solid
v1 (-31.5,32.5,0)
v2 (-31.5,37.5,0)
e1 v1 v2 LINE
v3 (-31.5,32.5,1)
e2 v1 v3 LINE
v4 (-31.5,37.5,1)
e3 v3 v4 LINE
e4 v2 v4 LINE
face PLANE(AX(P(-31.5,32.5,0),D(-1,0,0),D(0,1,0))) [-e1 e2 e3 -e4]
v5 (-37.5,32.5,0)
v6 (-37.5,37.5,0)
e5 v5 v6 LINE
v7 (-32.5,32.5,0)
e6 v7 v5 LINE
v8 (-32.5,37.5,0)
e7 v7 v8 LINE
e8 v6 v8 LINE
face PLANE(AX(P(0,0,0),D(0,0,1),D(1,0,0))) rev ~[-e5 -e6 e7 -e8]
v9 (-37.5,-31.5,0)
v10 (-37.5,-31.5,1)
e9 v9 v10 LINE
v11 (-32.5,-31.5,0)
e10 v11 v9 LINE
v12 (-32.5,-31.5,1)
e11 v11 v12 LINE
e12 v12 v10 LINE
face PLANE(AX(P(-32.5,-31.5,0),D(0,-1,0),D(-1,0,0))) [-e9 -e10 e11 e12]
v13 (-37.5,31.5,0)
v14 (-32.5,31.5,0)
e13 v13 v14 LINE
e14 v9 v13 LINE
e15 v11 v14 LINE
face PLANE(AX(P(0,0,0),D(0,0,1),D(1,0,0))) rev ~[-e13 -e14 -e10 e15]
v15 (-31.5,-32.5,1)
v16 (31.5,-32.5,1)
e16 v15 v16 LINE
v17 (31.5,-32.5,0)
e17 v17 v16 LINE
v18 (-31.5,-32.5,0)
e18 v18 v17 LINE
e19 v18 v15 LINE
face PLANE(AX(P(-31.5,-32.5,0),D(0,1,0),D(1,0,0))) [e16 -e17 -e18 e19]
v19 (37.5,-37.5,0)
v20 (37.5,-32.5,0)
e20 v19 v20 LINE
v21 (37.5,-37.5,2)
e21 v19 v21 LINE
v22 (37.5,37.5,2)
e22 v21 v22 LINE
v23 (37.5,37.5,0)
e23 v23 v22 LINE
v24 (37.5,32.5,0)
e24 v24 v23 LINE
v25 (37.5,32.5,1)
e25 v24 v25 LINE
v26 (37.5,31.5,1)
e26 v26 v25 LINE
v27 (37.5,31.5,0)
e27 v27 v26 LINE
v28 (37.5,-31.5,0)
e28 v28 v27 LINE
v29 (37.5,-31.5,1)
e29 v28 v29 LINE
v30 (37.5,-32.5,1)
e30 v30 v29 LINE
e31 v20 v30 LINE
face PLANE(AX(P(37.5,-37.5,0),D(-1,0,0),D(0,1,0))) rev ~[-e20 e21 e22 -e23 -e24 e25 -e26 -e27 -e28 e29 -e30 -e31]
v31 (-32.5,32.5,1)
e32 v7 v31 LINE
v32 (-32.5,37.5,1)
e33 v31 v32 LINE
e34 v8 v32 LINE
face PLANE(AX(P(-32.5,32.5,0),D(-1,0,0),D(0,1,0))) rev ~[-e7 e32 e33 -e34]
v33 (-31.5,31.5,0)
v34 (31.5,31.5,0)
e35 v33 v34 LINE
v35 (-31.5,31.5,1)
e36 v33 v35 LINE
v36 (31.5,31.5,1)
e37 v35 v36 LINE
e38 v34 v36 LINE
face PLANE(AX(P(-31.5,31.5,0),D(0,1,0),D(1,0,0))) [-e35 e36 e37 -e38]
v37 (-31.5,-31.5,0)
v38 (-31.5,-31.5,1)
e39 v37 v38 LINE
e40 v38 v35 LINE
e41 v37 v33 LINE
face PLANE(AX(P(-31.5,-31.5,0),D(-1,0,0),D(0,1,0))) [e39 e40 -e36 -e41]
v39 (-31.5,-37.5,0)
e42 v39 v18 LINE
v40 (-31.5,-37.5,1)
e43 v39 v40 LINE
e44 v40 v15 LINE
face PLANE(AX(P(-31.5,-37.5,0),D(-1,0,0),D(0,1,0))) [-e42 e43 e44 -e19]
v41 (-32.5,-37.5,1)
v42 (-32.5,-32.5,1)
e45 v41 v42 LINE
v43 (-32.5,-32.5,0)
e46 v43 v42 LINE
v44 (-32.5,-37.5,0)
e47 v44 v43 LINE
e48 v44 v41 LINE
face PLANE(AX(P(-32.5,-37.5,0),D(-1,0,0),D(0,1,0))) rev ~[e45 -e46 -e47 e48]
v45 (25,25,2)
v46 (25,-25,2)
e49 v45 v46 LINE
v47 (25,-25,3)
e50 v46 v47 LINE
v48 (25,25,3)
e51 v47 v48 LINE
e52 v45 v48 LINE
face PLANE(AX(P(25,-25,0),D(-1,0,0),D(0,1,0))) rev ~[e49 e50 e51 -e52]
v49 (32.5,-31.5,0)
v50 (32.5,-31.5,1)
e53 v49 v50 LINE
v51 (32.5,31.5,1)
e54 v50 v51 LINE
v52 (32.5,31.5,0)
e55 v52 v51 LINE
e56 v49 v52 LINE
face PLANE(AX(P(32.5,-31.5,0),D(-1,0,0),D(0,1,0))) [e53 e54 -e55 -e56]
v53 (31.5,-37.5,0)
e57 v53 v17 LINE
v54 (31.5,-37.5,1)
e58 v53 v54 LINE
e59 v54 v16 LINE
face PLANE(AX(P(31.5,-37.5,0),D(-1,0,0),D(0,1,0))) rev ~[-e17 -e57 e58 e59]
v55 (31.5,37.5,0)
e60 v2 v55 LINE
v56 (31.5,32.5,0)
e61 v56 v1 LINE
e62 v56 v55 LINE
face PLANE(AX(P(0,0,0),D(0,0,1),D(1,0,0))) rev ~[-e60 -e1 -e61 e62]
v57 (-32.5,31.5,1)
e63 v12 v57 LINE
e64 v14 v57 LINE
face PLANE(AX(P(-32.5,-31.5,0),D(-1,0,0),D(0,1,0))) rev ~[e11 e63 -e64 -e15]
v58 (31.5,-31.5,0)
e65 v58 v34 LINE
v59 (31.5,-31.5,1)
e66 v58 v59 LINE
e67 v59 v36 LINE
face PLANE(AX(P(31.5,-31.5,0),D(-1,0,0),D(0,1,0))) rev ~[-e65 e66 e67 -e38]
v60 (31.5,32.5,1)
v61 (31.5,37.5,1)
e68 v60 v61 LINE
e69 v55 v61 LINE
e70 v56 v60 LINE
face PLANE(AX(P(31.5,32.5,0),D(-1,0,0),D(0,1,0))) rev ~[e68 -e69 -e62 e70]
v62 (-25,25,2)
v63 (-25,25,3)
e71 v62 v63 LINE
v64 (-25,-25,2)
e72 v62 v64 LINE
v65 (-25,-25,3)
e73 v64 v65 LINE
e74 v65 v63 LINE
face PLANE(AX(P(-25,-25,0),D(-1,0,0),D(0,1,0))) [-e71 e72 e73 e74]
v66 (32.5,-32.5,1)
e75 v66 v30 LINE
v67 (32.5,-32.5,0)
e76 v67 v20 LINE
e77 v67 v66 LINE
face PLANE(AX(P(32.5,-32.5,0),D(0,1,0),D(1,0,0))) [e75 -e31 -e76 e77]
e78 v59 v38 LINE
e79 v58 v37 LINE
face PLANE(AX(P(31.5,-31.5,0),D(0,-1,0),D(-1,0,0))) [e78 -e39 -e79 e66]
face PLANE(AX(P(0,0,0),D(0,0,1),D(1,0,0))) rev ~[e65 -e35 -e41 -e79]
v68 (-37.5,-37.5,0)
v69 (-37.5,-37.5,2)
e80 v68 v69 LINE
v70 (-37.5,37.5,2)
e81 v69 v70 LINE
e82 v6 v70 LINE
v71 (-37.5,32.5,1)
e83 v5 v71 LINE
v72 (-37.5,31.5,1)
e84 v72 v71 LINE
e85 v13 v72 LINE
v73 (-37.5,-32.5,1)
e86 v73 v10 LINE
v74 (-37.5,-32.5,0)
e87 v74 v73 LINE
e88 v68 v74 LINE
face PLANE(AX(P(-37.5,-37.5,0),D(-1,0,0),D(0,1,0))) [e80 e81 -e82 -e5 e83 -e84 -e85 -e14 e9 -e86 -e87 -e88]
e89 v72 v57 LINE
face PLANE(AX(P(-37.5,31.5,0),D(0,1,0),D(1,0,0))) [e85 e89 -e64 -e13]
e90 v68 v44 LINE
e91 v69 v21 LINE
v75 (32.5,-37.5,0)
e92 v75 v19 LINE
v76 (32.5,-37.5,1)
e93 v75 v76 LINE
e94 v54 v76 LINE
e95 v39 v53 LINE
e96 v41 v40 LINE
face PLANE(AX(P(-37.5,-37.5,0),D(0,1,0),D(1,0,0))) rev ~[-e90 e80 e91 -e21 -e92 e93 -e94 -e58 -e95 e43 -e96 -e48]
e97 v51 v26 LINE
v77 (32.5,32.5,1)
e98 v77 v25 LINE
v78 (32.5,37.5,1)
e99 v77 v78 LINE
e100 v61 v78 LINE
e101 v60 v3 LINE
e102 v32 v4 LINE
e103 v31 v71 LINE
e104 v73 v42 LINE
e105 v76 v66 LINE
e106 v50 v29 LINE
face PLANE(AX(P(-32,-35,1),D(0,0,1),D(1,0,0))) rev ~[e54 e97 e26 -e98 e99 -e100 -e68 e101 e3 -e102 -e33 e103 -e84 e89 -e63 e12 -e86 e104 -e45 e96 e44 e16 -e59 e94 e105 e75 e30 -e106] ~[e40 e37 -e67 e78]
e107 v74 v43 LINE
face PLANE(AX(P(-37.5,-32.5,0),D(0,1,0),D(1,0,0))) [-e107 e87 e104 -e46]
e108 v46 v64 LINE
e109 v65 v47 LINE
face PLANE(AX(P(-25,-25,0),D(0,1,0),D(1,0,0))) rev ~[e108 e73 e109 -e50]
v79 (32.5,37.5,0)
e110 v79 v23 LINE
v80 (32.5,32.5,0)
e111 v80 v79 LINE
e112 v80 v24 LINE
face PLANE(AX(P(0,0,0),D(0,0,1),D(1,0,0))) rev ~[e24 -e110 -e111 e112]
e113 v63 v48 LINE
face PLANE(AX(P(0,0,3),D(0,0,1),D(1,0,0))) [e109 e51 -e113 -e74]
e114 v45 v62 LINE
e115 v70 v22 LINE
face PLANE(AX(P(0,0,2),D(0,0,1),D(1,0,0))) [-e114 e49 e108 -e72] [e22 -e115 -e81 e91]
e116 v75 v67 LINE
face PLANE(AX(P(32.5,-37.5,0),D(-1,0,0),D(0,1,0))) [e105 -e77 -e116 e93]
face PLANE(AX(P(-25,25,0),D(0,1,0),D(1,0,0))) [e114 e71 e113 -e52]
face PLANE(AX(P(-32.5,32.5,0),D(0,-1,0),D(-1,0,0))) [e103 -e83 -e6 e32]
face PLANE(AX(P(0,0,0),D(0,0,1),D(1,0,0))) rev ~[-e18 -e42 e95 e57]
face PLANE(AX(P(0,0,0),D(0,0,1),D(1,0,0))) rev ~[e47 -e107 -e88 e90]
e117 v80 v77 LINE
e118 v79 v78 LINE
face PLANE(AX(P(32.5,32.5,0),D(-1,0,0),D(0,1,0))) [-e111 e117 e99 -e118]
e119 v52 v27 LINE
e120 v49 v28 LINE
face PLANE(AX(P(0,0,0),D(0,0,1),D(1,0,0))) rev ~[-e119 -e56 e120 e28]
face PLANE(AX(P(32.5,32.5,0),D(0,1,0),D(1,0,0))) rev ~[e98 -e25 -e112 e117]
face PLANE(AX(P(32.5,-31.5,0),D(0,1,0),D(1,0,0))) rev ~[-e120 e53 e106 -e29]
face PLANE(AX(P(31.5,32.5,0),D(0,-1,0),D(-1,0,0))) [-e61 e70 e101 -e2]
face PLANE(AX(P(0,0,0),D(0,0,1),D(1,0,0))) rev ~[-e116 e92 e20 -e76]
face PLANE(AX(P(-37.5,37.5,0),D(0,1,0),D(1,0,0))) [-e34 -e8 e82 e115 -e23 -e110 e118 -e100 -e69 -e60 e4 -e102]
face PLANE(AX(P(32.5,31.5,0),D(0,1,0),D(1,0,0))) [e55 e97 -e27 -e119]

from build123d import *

# Parameters (mm, degrees)
F0_W     = 75
F0_H     = 75
F0_W_2   = 50
F0_H_2   = 50
F1_DEPTH = 2
F2_DEPTH = 3
F3_W     = 1
F3_H     = 5
F3_W_2   = 5
F3_H_2   = 1
F3_W_3   = 63
F3_H_3   = 63
F4_DEPTH = 1


with BuildPart() as f1:
    # F0 (on Top) → F1 (new body)
    with BuildSketch(Plane.XY):
        Rectangle(F0_W, F0_H)
        Rectangle(F0_W_2, F0_H_2, mode=Mode.SUBTRACT)
        Rectangle(F0_W_2, F0_H_2)
    extrude(amount=F1_DEPTH)

    # F0 (on Top) → F2 (join)
    with BuildSketch(Plane.XY):
        Rectangle(F0_W_2, F0_H_2)
    extrude(amount=F2_DEPTH)

    # F3 (on face) → F4 (cut)
    with BuildSketch(Plane.XY):
        with Locations((-32, -35)):
            Rectangle(F3_W, F3_H)
        with Locations((-35, -32)):
            Rectangle(F3_W_2, F3_H_2)
        with Locations((-32, -32)):
            Rectangle(F3_W, F3_H_2)
        with Locations((0, -32)):
            Rectangle(F3_W_3, F3_H_2)
        with Locations((-32, 0)):
            Rectangle(F3_W, F3_H_3)
        with Locations((32, -32)):
            Rectangle(F3_W, F3_H_2)
        with Locations((32, -35)):
            Rectangle(F3_W, F3_H)
        with Locations((-35, 32)):
            Rectangle(F3_W_2, F3_H_2)
        with Locations((-32, 32)):
            Rectangle(F3_W, F3_H_2)
        with Locations((0, 32)):
            Rectangle(F3_W_3, F3_H_2)
        with Locations((32, 0)):
            Rectangle(F3_W, F3_H_3)
        with Locations((35, -32)):
            Rectangle(F3_W_2, F3_H_2)
        with Locations((-32, 35)):
            Rectangle(F3_W, F3_H)
        with Locations((32, 32)):
            Rectangle(F3_W, F3_H_2)
        with Locations((32, 35)):
            Rectangle(F3_W, F3_H)
        with Locations((35, 32)):
            Rectangle(F3_W_2, F3_H_2)
    extrude(amount=F4_DEPTH, mode=Mode.SUBTRACT)


solid = f1.part
